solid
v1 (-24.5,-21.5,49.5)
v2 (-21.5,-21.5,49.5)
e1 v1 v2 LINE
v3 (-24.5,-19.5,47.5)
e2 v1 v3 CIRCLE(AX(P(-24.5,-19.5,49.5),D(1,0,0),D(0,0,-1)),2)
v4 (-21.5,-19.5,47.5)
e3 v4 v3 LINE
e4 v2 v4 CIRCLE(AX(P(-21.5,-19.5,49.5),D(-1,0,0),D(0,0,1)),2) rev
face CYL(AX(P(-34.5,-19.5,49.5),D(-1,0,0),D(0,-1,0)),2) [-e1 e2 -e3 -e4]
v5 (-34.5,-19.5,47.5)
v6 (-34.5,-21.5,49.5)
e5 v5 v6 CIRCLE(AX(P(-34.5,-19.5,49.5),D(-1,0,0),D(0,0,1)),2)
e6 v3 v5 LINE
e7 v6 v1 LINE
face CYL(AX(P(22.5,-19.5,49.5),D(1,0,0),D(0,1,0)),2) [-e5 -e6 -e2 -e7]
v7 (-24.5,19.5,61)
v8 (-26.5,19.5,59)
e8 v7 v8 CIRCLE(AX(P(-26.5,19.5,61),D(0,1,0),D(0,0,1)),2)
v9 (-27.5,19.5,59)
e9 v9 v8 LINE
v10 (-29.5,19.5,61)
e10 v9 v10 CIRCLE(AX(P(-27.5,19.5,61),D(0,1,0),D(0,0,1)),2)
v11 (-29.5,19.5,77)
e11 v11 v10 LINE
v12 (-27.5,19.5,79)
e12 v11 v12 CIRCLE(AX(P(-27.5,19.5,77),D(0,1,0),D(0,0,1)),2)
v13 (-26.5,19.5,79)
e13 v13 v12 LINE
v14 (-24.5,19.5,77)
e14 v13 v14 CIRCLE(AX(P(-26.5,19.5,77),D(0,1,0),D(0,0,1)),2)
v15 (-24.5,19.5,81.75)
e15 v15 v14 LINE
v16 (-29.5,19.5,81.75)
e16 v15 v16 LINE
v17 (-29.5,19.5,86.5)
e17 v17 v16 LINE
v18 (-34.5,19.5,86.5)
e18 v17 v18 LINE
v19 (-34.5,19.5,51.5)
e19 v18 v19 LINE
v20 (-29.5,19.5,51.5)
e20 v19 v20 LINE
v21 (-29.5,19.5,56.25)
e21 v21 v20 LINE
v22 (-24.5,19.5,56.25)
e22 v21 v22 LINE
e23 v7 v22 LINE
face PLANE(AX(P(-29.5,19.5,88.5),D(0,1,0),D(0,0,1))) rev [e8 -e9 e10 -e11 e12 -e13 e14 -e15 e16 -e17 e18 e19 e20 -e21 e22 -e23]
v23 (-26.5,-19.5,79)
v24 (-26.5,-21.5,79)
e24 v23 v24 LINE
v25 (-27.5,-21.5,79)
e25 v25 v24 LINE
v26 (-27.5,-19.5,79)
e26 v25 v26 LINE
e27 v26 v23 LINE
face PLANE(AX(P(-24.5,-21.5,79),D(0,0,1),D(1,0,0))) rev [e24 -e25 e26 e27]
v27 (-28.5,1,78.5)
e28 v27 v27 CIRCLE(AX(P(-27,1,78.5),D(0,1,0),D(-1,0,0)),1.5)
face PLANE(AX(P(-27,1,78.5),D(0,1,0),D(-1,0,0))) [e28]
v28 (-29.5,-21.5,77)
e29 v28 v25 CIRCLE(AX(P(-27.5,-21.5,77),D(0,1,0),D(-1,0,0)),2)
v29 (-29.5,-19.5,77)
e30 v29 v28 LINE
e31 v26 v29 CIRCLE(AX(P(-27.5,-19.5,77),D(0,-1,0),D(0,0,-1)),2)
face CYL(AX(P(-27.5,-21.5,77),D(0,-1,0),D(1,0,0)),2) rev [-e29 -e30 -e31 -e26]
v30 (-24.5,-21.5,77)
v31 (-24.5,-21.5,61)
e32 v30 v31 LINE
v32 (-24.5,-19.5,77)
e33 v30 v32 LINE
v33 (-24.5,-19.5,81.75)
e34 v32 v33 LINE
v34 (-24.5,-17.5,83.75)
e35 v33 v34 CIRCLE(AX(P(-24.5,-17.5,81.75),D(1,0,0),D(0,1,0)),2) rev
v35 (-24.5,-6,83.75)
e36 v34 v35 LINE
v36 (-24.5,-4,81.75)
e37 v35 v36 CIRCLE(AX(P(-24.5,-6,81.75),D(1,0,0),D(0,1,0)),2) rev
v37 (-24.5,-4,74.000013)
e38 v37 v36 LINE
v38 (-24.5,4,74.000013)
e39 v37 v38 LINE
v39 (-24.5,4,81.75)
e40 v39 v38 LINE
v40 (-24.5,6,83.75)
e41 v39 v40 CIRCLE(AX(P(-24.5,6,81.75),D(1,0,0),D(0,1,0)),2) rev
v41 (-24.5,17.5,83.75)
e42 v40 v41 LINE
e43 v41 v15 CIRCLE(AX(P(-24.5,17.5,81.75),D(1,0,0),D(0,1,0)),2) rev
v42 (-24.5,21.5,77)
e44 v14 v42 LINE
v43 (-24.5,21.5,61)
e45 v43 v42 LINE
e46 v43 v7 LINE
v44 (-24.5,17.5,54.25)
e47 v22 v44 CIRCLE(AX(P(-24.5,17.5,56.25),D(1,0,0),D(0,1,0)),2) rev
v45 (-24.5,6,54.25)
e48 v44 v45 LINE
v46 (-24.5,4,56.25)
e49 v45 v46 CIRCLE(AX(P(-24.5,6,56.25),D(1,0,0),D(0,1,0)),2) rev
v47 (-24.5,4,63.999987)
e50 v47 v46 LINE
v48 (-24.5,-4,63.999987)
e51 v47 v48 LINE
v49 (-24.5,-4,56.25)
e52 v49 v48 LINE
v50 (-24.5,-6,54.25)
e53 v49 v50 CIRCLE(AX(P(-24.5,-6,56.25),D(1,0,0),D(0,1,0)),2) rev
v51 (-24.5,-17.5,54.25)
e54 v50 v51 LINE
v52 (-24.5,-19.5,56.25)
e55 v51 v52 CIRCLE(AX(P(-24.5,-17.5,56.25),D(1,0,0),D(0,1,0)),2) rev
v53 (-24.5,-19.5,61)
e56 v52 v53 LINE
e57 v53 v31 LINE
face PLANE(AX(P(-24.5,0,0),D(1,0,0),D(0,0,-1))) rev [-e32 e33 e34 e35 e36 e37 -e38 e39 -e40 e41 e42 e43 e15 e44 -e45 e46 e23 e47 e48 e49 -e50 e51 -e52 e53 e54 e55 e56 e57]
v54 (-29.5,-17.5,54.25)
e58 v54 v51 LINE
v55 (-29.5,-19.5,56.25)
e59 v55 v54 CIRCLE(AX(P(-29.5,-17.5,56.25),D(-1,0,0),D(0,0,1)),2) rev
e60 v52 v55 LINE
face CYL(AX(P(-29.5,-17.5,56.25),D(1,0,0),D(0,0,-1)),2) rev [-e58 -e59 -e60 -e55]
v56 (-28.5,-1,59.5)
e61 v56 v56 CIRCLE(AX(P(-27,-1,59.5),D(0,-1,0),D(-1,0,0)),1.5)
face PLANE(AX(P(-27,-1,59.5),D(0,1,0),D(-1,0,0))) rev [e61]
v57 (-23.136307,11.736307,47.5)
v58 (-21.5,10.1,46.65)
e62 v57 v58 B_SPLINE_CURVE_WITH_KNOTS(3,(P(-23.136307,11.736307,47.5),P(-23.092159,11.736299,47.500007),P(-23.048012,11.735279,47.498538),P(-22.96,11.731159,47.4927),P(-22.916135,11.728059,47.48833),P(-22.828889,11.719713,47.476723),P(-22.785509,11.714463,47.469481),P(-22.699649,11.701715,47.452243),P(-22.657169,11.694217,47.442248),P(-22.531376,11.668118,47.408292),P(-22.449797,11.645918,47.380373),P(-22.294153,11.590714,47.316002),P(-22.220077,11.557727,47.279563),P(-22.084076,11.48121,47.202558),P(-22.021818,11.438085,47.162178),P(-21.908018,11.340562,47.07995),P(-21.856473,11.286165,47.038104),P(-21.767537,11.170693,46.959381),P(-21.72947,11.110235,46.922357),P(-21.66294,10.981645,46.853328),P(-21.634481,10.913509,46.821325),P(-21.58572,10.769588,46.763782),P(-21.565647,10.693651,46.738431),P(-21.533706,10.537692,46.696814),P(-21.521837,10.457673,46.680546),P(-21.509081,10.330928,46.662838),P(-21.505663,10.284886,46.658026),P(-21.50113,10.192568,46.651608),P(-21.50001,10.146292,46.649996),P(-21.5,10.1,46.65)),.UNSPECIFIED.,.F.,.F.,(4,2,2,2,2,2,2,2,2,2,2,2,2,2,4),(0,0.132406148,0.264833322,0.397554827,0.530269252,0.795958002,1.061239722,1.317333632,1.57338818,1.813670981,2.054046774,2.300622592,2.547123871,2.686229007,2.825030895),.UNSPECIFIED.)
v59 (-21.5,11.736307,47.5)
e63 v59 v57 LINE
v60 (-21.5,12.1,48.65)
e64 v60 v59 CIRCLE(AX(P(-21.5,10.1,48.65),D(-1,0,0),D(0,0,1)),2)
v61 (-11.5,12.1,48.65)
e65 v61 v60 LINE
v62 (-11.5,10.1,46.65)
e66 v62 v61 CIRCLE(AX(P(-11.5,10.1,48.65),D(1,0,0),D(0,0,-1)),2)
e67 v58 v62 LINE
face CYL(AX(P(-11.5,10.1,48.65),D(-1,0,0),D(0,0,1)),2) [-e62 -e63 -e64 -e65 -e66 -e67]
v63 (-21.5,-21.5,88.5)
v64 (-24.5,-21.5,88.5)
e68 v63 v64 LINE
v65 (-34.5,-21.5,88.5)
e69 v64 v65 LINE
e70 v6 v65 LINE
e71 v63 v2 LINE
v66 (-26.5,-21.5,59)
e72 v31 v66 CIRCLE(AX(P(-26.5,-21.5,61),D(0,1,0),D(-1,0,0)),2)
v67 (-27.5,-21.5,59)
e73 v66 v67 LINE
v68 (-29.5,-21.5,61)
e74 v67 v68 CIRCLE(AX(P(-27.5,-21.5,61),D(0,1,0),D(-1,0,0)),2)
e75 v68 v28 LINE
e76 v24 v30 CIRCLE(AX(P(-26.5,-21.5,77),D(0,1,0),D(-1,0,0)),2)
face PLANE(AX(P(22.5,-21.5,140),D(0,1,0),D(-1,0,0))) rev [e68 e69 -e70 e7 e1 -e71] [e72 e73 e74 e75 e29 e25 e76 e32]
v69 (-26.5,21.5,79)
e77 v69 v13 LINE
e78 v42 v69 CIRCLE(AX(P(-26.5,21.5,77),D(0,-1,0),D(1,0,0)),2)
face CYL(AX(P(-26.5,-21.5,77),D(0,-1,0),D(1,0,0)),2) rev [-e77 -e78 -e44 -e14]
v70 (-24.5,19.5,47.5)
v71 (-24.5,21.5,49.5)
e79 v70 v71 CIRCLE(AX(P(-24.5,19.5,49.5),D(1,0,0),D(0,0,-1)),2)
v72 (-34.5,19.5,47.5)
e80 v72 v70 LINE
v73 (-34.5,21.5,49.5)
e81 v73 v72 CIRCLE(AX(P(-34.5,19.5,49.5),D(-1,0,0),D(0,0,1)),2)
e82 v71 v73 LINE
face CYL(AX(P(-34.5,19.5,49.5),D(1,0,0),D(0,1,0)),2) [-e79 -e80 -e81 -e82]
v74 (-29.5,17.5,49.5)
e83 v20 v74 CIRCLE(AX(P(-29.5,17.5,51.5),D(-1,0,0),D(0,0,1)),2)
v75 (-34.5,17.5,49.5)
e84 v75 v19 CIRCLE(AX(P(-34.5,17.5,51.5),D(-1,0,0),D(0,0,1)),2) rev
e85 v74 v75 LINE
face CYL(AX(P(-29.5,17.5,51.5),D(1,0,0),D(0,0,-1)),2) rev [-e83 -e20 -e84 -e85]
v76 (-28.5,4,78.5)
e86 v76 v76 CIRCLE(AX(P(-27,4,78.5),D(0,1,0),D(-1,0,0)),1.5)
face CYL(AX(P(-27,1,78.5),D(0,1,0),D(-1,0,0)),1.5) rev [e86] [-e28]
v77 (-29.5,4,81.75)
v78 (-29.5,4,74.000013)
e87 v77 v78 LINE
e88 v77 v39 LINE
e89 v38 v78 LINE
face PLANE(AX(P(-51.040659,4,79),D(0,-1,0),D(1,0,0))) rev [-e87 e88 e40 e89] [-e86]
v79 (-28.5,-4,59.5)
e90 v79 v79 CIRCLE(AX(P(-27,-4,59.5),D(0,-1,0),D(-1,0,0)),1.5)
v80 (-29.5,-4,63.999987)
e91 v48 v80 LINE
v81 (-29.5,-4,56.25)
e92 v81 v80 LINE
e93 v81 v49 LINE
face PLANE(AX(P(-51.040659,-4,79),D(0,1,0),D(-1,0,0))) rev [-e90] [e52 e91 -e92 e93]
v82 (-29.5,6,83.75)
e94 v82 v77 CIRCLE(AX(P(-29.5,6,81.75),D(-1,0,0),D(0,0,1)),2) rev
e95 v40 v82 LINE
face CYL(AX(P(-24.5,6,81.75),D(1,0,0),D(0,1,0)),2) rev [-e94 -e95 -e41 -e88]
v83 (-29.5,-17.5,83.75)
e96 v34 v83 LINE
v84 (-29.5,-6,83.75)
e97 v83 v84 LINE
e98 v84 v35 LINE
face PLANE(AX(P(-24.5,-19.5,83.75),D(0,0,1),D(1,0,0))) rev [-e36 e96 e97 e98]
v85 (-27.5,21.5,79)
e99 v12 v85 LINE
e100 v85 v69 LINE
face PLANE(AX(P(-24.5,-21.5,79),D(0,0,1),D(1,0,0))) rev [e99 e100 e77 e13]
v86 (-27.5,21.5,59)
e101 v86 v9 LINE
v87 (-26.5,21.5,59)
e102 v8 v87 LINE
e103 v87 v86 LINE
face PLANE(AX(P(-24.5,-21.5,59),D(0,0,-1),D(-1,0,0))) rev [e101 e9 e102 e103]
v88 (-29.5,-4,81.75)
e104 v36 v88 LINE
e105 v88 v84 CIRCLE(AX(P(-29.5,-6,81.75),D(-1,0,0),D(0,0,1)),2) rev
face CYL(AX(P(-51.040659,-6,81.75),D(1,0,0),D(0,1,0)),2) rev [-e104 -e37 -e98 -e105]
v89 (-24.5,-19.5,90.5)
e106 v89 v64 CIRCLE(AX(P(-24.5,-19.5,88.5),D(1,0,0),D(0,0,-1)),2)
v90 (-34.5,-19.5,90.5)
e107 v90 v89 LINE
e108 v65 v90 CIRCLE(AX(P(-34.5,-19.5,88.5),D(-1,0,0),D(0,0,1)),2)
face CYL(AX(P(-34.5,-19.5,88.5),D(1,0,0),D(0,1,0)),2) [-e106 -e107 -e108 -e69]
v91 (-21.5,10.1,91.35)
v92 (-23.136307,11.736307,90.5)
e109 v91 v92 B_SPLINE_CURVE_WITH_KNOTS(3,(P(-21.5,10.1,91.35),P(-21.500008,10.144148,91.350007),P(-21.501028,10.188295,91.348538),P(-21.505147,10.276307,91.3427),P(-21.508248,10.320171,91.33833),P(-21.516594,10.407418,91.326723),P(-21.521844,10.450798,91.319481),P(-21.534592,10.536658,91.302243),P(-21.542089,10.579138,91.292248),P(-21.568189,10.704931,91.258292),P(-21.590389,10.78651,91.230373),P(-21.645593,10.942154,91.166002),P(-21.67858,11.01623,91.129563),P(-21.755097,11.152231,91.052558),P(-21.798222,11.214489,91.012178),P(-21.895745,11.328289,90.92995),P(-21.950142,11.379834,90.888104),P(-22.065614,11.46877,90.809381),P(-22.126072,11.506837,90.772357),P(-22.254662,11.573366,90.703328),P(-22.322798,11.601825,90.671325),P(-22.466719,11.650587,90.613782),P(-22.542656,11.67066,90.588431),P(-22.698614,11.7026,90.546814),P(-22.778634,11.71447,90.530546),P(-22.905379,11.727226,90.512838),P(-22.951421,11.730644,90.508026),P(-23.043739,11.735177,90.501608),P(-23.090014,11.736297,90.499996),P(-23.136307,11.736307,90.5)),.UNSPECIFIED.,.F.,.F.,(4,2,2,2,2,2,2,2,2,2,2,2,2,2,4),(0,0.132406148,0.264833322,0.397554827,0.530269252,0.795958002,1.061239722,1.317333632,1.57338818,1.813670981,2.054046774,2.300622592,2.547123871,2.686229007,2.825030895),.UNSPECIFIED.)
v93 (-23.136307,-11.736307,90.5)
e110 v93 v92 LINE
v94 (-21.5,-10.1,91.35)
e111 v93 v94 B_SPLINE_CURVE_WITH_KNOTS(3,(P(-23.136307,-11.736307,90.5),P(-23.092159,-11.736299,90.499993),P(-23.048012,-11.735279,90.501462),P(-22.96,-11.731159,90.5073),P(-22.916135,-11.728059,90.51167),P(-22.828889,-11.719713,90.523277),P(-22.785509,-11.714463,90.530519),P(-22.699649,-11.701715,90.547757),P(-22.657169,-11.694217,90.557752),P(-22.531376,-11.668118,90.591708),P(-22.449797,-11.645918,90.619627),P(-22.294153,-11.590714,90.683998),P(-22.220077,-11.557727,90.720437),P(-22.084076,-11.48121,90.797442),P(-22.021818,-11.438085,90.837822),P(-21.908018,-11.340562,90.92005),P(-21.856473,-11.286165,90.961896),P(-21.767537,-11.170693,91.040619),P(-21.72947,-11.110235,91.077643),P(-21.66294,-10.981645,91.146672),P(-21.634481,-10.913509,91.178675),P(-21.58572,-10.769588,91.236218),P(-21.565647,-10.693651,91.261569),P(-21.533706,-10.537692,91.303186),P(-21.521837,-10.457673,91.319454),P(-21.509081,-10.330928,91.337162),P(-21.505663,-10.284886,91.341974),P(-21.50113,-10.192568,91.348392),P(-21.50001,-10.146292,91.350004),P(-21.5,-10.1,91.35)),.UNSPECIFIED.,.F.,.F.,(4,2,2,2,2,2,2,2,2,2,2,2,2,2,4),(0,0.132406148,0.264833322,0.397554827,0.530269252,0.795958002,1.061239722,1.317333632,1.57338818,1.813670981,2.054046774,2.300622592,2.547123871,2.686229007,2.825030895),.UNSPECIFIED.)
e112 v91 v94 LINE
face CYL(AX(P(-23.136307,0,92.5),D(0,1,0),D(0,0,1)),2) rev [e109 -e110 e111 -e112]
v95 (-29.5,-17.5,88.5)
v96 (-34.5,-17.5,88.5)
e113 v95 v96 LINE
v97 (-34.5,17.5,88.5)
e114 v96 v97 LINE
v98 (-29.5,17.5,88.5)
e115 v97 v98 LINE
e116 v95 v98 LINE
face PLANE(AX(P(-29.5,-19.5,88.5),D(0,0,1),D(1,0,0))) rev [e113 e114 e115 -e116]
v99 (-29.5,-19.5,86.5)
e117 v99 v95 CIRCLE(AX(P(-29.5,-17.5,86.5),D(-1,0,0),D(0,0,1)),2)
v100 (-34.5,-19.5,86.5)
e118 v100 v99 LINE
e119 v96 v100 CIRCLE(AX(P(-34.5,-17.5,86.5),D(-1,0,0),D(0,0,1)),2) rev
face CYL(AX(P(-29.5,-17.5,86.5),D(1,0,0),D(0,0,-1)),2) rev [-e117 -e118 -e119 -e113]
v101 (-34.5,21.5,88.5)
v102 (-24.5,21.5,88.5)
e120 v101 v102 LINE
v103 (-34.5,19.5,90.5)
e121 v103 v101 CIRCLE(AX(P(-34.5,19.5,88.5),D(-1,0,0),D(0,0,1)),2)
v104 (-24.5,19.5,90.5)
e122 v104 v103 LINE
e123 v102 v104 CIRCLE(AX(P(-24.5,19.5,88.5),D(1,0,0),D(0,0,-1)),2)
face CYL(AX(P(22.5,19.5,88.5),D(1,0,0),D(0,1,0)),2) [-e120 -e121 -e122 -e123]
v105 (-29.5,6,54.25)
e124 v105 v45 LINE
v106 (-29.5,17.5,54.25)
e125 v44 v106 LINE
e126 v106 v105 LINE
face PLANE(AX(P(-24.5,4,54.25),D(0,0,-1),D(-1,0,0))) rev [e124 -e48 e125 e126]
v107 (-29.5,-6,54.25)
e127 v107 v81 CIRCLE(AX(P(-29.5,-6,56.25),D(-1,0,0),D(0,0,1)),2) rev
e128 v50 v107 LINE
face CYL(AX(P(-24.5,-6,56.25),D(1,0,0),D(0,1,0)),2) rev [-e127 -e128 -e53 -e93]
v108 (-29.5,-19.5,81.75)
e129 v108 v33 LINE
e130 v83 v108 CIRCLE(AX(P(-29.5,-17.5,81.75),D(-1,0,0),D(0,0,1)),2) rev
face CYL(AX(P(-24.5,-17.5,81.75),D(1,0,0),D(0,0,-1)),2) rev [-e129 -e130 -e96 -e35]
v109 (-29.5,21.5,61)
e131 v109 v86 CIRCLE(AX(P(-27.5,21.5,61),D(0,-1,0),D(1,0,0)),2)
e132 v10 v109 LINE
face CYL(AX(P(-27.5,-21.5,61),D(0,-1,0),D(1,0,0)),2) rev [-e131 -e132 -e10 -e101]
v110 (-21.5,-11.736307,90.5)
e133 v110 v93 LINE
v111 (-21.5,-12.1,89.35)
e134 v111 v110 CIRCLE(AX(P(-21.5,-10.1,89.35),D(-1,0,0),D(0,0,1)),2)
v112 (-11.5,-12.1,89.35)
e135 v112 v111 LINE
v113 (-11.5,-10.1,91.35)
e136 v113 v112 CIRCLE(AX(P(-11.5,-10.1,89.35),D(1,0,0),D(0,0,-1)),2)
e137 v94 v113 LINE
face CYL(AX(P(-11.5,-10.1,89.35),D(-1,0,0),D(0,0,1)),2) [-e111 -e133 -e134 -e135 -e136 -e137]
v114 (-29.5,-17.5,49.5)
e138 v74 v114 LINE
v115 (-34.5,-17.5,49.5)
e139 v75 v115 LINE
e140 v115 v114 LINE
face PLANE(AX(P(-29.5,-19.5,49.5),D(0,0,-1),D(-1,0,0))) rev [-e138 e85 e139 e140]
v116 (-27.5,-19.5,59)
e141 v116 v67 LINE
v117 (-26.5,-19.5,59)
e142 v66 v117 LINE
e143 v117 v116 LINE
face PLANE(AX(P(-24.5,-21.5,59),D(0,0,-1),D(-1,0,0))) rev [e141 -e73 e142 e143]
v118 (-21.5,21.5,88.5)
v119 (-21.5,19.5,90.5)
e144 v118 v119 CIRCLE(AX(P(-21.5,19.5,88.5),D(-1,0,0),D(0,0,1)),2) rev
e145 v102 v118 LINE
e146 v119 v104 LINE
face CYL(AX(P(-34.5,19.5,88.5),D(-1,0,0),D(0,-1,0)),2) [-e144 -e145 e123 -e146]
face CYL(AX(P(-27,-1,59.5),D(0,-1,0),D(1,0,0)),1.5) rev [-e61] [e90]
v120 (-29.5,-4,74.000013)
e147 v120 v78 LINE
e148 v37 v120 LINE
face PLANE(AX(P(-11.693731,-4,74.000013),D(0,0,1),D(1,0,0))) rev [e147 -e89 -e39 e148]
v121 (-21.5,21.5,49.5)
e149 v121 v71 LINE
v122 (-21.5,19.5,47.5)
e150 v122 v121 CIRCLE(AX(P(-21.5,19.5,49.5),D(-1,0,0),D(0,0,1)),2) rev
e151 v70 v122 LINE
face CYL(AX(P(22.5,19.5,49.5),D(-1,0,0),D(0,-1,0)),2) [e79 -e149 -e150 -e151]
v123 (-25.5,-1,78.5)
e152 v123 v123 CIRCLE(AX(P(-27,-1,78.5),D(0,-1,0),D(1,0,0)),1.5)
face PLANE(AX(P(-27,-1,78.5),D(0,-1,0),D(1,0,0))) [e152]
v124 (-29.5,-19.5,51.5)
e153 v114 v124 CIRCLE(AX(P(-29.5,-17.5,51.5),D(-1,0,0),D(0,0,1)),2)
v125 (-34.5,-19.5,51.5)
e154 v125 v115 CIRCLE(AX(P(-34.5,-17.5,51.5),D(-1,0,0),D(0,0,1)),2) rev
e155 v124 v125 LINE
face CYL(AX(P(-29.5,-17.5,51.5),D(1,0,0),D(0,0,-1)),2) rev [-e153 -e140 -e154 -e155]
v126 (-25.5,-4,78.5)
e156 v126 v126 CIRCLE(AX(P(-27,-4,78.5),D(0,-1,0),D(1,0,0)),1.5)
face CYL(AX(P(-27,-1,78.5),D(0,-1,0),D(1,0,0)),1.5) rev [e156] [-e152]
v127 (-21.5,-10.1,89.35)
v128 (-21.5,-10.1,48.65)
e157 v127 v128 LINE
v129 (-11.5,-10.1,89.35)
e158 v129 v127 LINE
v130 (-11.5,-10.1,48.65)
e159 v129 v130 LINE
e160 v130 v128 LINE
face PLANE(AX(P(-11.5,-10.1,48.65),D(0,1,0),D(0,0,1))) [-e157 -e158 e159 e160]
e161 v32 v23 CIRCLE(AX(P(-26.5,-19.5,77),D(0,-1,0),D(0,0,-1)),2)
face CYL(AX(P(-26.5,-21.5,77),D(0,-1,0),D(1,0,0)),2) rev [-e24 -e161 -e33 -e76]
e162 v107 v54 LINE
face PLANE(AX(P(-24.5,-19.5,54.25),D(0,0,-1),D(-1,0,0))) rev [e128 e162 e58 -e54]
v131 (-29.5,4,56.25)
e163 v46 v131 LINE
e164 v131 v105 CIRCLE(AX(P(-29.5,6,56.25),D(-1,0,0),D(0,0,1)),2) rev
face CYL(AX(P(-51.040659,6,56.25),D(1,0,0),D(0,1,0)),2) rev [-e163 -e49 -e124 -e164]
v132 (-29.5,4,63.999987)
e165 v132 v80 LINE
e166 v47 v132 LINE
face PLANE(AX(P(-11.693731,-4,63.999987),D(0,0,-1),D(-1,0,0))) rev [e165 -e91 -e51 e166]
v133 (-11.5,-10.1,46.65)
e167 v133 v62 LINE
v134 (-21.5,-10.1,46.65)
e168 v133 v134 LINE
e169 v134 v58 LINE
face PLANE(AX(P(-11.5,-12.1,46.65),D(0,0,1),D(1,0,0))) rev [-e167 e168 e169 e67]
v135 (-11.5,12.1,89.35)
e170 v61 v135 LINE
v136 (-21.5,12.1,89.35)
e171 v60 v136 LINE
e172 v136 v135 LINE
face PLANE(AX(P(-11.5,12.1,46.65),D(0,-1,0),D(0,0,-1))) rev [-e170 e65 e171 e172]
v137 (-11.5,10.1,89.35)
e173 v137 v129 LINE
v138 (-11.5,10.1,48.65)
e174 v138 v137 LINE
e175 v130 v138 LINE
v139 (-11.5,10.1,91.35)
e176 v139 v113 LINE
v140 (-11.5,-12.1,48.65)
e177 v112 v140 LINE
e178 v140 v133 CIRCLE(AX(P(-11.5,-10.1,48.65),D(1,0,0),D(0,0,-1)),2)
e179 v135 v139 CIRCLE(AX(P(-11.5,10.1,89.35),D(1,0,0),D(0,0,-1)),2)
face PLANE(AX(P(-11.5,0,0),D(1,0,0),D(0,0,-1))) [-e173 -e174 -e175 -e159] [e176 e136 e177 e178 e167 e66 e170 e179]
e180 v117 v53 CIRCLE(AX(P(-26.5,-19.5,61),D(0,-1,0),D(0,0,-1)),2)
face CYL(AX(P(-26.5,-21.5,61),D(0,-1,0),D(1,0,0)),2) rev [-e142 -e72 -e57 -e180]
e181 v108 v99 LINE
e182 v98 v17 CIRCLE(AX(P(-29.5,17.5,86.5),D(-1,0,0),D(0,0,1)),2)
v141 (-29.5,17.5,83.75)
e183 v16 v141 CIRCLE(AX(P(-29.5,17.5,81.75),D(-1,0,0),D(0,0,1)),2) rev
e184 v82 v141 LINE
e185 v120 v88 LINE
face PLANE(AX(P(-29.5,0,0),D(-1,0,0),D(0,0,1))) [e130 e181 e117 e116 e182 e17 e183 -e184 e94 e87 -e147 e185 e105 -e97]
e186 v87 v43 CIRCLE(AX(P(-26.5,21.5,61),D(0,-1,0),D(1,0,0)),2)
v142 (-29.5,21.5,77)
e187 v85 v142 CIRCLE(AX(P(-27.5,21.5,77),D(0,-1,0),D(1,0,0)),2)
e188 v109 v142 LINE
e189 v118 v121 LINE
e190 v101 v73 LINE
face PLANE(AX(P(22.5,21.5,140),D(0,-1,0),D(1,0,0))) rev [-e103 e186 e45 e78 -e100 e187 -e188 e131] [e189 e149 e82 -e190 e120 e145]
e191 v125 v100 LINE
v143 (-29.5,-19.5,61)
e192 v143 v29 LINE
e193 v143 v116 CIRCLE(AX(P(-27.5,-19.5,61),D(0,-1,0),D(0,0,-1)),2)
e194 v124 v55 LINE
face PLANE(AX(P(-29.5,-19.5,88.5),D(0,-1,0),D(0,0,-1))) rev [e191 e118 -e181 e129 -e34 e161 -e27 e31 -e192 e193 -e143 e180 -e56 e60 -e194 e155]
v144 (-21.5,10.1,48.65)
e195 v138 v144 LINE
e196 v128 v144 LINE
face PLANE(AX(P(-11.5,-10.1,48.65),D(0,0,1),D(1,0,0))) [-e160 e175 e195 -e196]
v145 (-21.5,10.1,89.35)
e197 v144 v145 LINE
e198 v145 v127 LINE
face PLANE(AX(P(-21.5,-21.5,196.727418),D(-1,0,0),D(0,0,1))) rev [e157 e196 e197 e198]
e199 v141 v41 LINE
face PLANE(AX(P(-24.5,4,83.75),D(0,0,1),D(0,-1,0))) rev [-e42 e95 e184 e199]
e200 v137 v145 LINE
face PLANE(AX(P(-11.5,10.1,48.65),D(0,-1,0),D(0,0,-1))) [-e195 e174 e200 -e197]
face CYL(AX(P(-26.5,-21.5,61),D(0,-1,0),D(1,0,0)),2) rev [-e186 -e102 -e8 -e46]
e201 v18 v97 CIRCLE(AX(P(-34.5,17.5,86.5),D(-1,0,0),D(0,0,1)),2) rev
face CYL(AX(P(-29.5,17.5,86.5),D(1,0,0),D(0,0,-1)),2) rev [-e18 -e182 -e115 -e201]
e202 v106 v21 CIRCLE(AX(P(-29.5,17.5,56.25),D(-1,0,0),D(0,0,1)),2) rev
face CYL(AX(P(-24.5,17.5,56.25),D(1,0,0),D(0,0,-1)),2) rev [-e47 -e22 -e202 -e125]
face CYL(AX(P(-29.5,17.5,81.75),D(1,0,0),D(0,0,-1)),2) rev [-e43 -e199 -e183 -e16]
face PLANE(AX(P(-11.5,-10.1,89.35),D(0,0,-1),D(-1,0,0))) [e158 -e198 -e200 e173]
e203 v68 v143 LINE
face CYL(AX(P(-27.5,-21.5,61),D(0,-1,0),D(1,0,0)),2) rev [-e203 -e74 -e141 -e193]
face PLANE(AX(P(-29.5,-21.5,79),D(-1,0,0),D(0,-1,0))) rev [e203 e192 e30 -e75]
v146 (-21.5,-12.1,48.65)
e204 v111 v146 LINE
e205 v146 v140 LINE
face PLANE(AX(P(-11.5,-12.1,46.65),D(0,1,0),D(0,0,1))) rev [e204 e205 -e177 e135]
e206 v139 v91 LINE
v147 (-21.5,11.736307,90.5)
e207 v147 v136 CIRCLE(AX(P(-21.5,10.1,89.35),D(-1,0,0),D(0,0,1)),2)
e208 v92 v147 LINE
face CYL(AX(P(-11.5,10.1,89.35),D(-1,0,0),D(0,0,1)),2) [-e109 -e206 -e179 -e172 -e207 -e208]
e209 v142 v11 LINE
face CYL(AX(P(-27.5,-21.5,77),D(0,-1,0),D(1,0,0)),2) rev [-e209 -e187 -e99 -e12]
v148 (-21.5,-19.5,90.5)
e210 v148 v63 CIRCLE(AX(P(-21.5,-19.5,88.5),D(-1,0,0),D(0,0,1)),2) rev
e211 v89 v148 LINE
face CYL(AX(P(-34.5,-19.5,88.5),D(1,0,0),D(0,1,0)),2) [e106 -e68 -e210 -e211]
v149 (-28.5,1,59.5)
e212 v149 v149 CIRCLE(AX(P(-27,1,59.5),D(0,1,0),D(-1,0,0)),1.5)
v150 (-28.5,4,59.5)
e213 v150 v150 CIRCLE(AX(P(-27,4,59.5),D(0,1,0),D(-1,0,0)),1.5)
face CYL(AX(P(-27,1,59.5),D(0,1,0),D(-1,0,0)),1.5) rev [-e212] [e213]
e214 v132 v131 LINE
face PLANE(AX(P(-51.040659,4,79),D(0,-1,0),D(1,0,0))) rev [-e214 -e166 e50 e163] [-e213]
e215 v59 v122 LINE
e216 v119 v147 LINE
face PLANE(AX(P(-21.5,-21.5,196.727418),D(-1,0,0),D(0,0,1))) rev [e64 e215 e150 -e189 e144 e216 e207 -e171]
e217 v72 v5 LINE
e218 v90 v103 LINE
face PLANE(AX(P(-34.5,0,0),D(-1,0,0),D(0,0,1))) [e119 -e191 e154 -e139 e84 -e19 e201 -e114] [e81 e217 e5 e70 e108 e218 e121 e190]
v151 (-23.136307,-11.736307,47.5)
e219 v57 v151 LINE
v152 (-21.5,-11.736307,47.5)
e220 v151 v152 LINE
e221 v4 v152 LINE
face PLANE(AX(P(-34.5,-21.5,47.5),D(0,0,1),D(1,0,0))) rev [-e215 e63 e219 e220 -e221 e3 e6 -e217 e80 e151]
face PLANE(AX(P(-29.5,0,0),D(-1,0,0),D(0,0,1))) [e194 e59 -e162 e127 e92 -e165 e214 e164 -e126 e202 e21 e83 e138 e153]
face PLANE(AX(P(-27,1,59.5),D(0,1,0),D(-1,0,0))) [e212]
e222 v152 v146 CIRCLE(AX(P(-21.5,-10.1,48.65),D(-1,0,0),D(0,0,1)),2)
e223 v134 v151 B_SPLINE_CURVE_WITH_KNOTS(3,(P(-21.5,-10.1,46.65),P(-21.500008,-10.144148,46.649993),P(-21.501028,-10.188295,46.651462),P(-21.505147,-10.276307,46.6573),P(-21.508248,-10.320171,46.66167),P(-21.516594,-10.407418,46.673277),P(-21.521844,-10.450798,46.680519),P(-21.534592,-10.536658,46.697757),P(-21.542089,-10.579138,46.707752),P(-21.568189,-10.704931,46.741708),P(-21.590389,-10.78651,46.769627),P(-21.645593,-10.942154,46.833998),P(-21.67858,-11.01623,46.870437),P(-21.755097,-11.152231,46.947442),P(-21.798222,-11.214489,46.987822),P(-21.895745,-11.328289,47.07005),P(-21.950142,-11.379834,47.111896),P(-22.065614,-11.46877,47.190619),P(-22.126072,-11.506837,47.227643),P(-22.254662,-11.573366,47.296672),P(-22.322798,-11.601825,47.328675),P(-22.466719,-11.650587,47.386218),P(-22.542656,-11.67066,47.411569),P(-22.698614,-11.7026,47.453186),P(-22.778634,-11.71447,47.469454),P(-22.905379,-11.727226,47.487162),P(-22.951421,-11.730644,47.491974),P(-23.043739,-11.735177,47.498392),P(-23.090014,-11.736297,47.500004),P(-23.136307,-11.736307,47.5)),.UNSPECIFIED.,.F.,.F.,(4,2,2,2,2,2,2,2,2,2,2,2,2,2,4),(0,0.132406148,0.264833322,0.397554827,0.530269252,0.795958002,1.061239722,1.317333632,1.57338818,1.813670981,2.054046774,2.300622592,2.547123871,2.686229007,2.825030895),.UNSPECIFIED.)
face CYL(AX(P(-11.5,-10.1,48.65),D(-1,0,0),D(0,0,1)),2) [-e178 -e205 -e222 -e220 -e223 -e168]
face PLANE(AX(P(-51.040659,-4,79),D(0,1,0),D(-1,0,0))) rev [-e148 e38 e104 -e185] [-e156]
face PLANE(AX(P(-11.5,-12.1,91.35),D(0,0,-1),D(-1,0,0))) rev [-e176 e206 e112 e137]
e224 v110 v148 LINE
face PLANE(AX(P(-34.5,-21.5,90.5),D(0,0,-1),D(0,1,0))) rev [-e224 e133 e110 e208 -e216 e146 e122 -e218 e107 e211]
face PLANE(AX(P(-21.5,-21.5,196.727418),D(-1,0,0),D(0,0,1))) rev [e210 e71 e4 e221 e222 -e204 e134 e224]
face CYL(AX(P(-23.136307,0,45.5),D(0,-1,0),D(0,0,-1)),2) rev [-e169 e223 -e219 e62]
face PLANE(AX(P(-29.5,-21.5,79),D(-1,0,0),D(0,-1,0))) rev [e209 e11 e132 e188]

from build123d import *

# Parameters (mm, degrees)
EXTRUDE_1_DEPTH      = 140
SKETCH_3_W           = 49
SKETCH_3_H           = 43
EXTRUDE_1_2_DEPTH    = 2
EXTRUDE_2_DEPTH      = 10
SKETCH_5_W           = 39
SKETCH_5_H           = 38.99999999999997
CUT_EXTRUDE_1_DEPTH  = 5
SKETCH_6_W           = 5.000000000000007
SKETCH_6_H           = 20.000000000000007
CUT_EXTRUDE_2_DEPTH  = 151.46345071146015
SKETCH_8_W           = 20.000000000000007
SKETCH_8_H           = 8
EXTRUDE_4_DEPTH      = 5
SKETCH_9_W           = 29.500000000000007
SKETCH_9_H           = 15.499999999999984
CUT_EXTRUDE_3_DEPTH  = 5
SKETCH_10_R          = 1.5000000000000009
CUT_EXTRUDE_4_DEPTH  = 3
CUT_EXTRUDE_START    = -3
SKETCH_11_R          = 1.5000000000000009
CUT_EXTRUDE_5_DEPTH  = 3
FILLET_1_R           = 2
SKETCH_12_W          = 10.000025874030214
SKETCH_12_H          = 7.999999999999993
CUT_EXTRUDE_6_DEPTH  = 5
FILLET_2_R           = 2
FILLET_3_R           = 2
FILLET_4_R           = 2
SKETCH_14_W          = 49
SKETCH_14_H          = 42.99999999999999
CUT_EXTRUDE_7_DEPTH  = 148.70409608402875
EXTRUDE_5_DEPTH      = 43
SKETCH_16_W          = 37
SKETCH_16_H          = 43.00000000000001
CUT_EXTRUDE_8_DEPTH  = 139
CUT_EXTRUDE_9_DEPTH  = 153.28673612629564
CUT_EXTRUDE_10_DEPTH = 10
CUT_EXTRUDE_11_DEPTH = 10
CUT_EXTRUDE_START_2  = -10
CUT_EXTRUDE_12_DEPTH = 10
FILLET_5_R           = 2
SKETCH_22_W          = 55.90289096918082
SKETCH_22_H          = 52.99366384823722
SKETCH_22_W_2        = 63.39349332103703
SKETCH_22_H_2        = 60.631140756012414
CUT_EXTRUDE_13_DEPTH = 149.4898986463389
SKETCH_24_W          = 48.12895324765829
SKETCH_24_H          = 5.063364692861221
SKETCH_24_W_2        = 50.818083994342985
SKETCH_24_H_2        = 4.997776138063802
CUT_EXTRUDE_14_DEPTH = 104.14795199130229
SKETCH_25_W          = 20.23714780138212
SKETCH_25_H          = 49.24602860882409
CUT_EXTRUDE_15_DEPTH = 106.96933518711913
FILLET_6_R           = 2
EXTRUDE_6_DEPTH      = 10
FILLET_7_R           = 2
FILLET_8_R           = 2


with BuildPart() as part:
    # 草图1 → Extrude 1 (new body)
    with BuildSketch(Plane.XY):
        Polygon((-24.49999999999998, 21.499999999999993), (24.50000000000002, 21.5), (24.50000000000002, -21.5), (-24.49999999999998, -21.500000000000007), align=None)
        Polygon((-22.49999999999998, 19.499999999999993), (22.50000000000002, 19.5), (22.50000000000002, -19.5), (-22.49999999999998, -19.500000000000007), align=None, mode=Mode.SUBTRACT)
    extrude(amount=EXTRUDE_1_DEPTH)

    # 草图3 → Extrude 1 2 (add)
    with BuildSketch(Plane(origin=(0, 0, 0), x_dir=(-1, 0, 0), z_dir=(0, 0, -1))):
        Rectangle(SKETCH_3_W, SKETCH_3_H)
    extrude(amount=EXTRUDE_1_2_DEPTH)

    # 草图4 → 凸台-拉伸2 (add)
    with BuildSketch(Plane.ZY.offset(24.49999999999998)):
        Polygon((90.5, -21.499999999999996), (47.50000000000001, -21.499999999999996), (47.50000000000001, 21.499999999999993), (90.50000000000001, 21.499999999999993), align=None)
    extrude(amount=EXTRUDE_2_DEPTH)

    # 草图5 → 切除-拉伸1 (cut)
    with BuildSketch(Plane.ZY.offset(34.49999999999998)):
        with Locations((69, 1.78e-15)):
            Rectangle(SKETCH_5_W, SKETCH_5_H)
    extrude(amount=-CUT_EXTRUDE_1_DEPTH, mode=Mode.SUBTRACT)

    # 草图6 → 切除-拉伸2 (cut, through all)
    with BuildSketch(Plane(origin=(-3.32e-15, 21.499999999999996, 0), x_dir=(1, 1.5e-16, 0), z_dir=(-1.5e-16, 1, 0))):
        with Locations((-26.99999999999998, -69.00000000000001)):
            Rectangle(SKETCH_6_W, SKETCH_6_H)
    extrude(amount=-CUT_EXTRUDE_2_DEPTH, mode=Mode.SUBTRACT)

    # 草图8 → 凸台-拉伸4 (add)
    with BuildSketch(Plane.ZY.offset(24.499999999999975)):
        with Locations((69.00000000000001, 4.4e-16)):
            Rectangle(SKETCH_8_W, SKETCH_8_H)
    extrude(amount=EXTRUDE_4_DEPTH)

    # 草图9 → 切除-拉伸3 (cut)
    with BuildSketch(Plane.ZY.offset(29.499999999999982)):
        Polygon((83.75000000000001, 3.9999999999999964), (54.25000000000001, 3.9999999999999964), (54.25000000000001, 19.49999999999999), (83.75, 19.49999999999999), align=None)
        with Locations((69.00000000000001, -11.749999999999996)):
            Rectangle(SKETCH_9_W, SKETCH_9_H)
    extrude(amount=-CUT_EXTRUDE_3_DEPTH, mode=Mode.SUBTRACT)

    # 草图10 → 切除-拉伸4 (cut)
    with BuildSketch(Plane.XZ.offset(4)):
        with Locations((-26.99999999999998, 78.5)):
            Circle(SKETCH_10_R)
        with Locations(Location((-26.999999999999975, 59.500000000000014, 0), (0, 0, 180))):
            Circle(SKETCH_10_R)
    extrude(amount=-CUT_EXTRUDE_4_DEPTH, mode=Mode.SUBTRACT)

    # 草图11 → 切除-拉伸5 (cut)
    with BuildSketch(Plane(origin=(-6.2e-16, 4.000000000000001, 0), x_dir=(1, 1.5e-16, 0), z_dir=(-1.5e-16, 1, 0)).offset(CUT_EXTRUDE_START)):
        with Locations(Location((-26.999999999999975, -59.500000000000014, 0), (0, 0, 180))):
            Circle(SKETCH_11_R)
        with Locations((-26.99999999999998, -78.5)):
            Circle(SKETCH_11_R)
    extrude(amount=CUT_EXTRUDE_5_DEPTH, mode=Mode.SUBTRACT)

    # 圆角1
    fillet_1_edges = [part.edges().sort_by_distance(p)[0] for p in [
        (-24.49999999999998, 20.499999999999993, 79.00000000000001),
        (-24.49999999999998, 20.499999999999993, 59.00000000000001),
        (-29.49999999999998, -20.499999999999993, 79.00000000000001),
        (-29.499999999999986, 20.499999999999993, 79.00000000000001),
        (-29.49999999999998, -20.499999999999993, 59.00000000000001),
        (-29.499999999999986, 20.499999999999993, 59.00000000000001),
        (-24.49999999999997, -20.5, 59.00000000000001),
        (-24.49999999999997, -20.5, 79.00000000000001),
    ]]
    fillet(fillet_1_edges, radius=FILLET_1_R)

    # 草图12 → 切除-拉伸6 (cut)
    with BuildSketch(Plane.ZY.offset(29.499999999999982)):
        with Locations((69, 0)):
            Rectangle(SKETCH_12_W, SKETCH_12_H)
    extrude(amount=-CUT_EXTRUDE_6_DEPTH, mode=Mode.SUBTRACT)

    # 圆角2
    fillet_2_edges = [part.edges().sort_by_distance(p)[0] for p in [
        (-31.99999999999998, -19.499999999999986, 49.50000000000001),
        (-31.99999999999998, 19.49999999999999, 49.50000000000001),
        (-31.99999999999998, 19.49999999999999, 88.5),
        (-31.99999999999998, -19.499999999999986, 88.5),
    ]]
    fillet(fillet_2_edges, radius=FILLET_2_R)

    # 圆角3
    fillet_3_edges = [part.edges().sort_by_distance(p)[0] for p in [
        (-29.49999999999998, 21.499999999999993, 47.50000000000001),
        (-29.49999999999998, -21.499999999999996, 47.50000000000001),
        (-29.49999999999998, -21.499999999999996, 90.5),
        (-29.49999999999998, 21.499999999999993, 90.50000000000001),
    ]]
    fillet(fillet_3_edges, radius=FILLET_3_R)

    # 圆角4
    fillet_4_edges = [part.edges().sort_by_distance(p)[0] for p in [
        (-26.999999999999982, 3.9999999999999964, 83.75000000000001),
        (-26.999999999999982, 19.49999999999999, 54.25000000000001),
        (-26.999999999999982, 3.9999999999999964, 54.25000000000001),
        (-26.999999999999982, 19.49999999999999, 83.75),
        (-26.999999999999982, -4.000000000000005, 54.25000000000001),
        (-26.999999999999982, -19.49999999999999, 83.75000000000001),
        (-26.999999999999982, -19.49999999999999, 54.25000000000001),
        (-26.999999999999982, -4.000000000000005, 83.75000000000001),
    ]]
    fillet(fillet_4_edges, radius=FILLET_4_R)

    # 草图14 → 切除-拉伸7 (cut, through all)
    with BuildSketch(Plane.XY.offset(140)):
        Rectangle(SKETCH_14_W, SKETCH_14_H)
    extrude(amount=-CUT_EXTRUDE_7_DEPTH, mode=Mode.SUBTRACT)

    # 草图15 → 凸台-拉伸5 (add)
    with BuildSketch(Plane(origin=(-24.49999999999998, 0, 0), x_dir=(0, 0, -1), z_dir=(1, 0, 0))):
        Polygon((1.999999999999988, -24.499999999999993), (-140, -24.50000000000001), (-140, 24.49999999999999), (1.999999999999988, 24.500000000000007), align=None)
    extrude(amount=EXTRUDE_5_DEPTH)

    # 草图16 → 切除-拉伸8 (cut)
    with BuildSketch(Plane(origin=(0, 0, -1.999999999999988), x_dir=(-1, 0, 0), z_dir=(0, 0, -1))):
        with Locations((2.9999999999999813, 3.55e-15)):
            Rectangle(SKETCH_16_W, SKETCH_16_H)
    extrude(amount=-CUT_EXTRUDE_8_DEPTH, mode=Mode.SUBTRACT)

    # 草图17 → 切除-拉伸9 (cut, through all)
    with BuildSketch(Plane.XZ.offset(24.499999999999993)):
        with BuildLine():
            Line((-11.999999999999824, 112), (6.000000000000174, 112))
            ThreePointArc((6.000000000000174, 112), (9.000000000000174, 115.00000000000001), (6.00000000000014, 117.99999999999989))
            Line((6.00000000000014, 117.99999999999989), (-11.999999999999854, 117.99999999999969))
            ThreePointArc((-11.999999999999854, 117.99999999999969), (-14.999999999999512, 114.99999999999999), (-11.999999999999824, 112))
        make_face()
        with BuildLine():
            Line((-11.999999999999668, 97), (6.00000000000033, 97))
            ThreePointArc((6.00000000000033, 97), (9.00000000000033, 100.00000000000001), (6.000000000000297, 102.99999999999947))
            Line((6.000000000000297, 102.99999999999947), (-11.999999999999698, 102.99999999999929))
            ThreePointArc((-11.999999999999698, 102.99999999999929), (-14.999999999998957, 99.99999999999999), (-11.999999999999668, 97))
        make_face()
        with BuildLine():
            Line((-11.999999999999512, 82), (6.000000000000487, 82))
            ThreePointArc((6.000000000000487, 82), (9.000000000000487, 85.00000000000001), (6.000000000000453, 87.99999999999908))
            Line((6.000000000000453, 87.99999999999908), (-11.999999999999542, 87.99999999999889))
            ThreePointArc((-11.999999999999542, 87.99999999999889), (-14.999999999998403, 84.99999999999999), (-11.999999999999512, 82))
        make_face()
        with BuildLine():
            Line((-11.999999999999355, 67.00000000000058), (6.000000000000643, 67))
            ThreePointArc((6.000000000000643, 67), (9.000000000000643, 70), (6.000000000000643, 73.00000000000034))
            Line((6.000000000000643, 73.00000000000034), (-11.999999999999355, 73.00000000000034))
            ThreePointArc((-11.999999999999355, 73.00000000000034), (-14.999999999999696, 70), (-11.999999999999355, 67.00000000000058))
        make_face()
        with BuildLine():
            Line((-11.999999999999199, 51.99999999999935), (6.000000000000797, 51.99999999999936))
            ThreePointArc((6.000000000000797, 51.99999999999936), (8.999999999999595, 54.99999999999816), (6.000000000000797, 57.99999999999685))
            Line((6.000000000000797, 57.99999999999685), (-11.999999999999199, 57.99999999999686))
            ThreePointArc((-11.999999999999199, 57.99999999999686), (-14.999999999997955, 54.9999999999981), (-11.999999999999199, 51.99999999999935))
        make_face()
        with BuildLine():
            Line((-11.999999999999043, 36.99999999999916), (6.000000000000953, 36.999999999999154))
            ThreePointArc((6.000000000000953, 36.999999999999154), (8.99999999999956, 39.99999999999776), (6.000000000000953, 42.999999999996184))
            Line((6.000000000000953, 42.999999999996184), (-11.999999999999043, 42.99999999999625))
            ThreePointArc((-11.999999999999043, 42.99999999999625), (-14.999999999997586, 39.999999999997705), (-11.999999999999043, 36.99999999999916))
        make_face()
        with BuildLine():
            Line((-11.999999999998886, 21.99999999999899), (6.000000000001109, 21.999999999998987))
            ThreePointArc((6.000000000001109, 21.999999999998987), (8.999999999999478, 24.999999999997357), (6.000000000001109, 27.999999999995616))
            Line((6.000000000001109, 27.999999999995616), (-11.999999999998886, 27.999999999995612))
            ThreePointArc((-11.999999999998886, 27.999999999995612), (-14.999999999997195, 24.999999999997303), (-11.999999999998886, 21.99999999999899))
        make_face()
        with BuildLine():
            Line((-11.99999999999873, 6.9999999999987645), (6.000000000001266, 6.9999999999987645))
            ThreePointArc((6.000000000001266, 6.9999999999987645), (8.999999999999456, 9.999999999996955), (6.000000000001266, 12.999999999995037))
            Line((6.000000000001266, 12.999999999995037), (-11.99999999999873, 12.999999999995037))
            ThreePointArc((-11.99999999999873, 12.999999999995037), (-14.999999999996867, 9.9999999999969), (-11.99999999999873, 6.9999999999987645))
        make_face()
    extrude(amount=-CUT_EXTRUDE_9_DEPTH, mode=Mode.SUBTRACT)

    # 草图18 → 切除-拉伸10 (cut)
    with BuildSketch(Plane(origin=(18.500000000000018, 0, 0), x_dir=(0, 0, -1), z_dir=(1, 0, 0))):
        with BuildLine():
            Line((-118.00000000000001, 12), (-118.00000000000001, -12))
            ThreePointArc((-118.00000000000001, -12), (-115, -15.000000000000014), (-112, -12))
            Line((-112, -12), (-112, 12))
            ThreePointArc((-112, 12), (-115, 15), (-118.00000000000001, 12))
        make_face()
        with BuildLine():
            Line((-103.00000000000001, 12), (-103.00000000000001, -12))
            ThreePointArc((-103.00000000000001, -12), (-100, -15.000000000000014), (-97, -12))
            Line((-97, -12), (-97, 12))
            ThreePointArc((-97, 12), (-100, 15), (-103.00000000000001, 12))
        make_face()
        with BuildLine():
            Line((-88.00000000000001, 12), (-88.00000000000001, -12))
            ThreePointArc((-88.00000000000001, -12), (-85, -15.000000000000014), (-82, -12))
            Line((-82, -12), (-82, 12))
            ThreePointArc((-82, 12), (-85, 15), (-88.00000000000001, 12))
        make_face()
        with BuildLine():
            Line((-73.00000000000001, 12), (-73.00000000000001, -12))
            ThreePointArc((-73.00000000000001, -12), (-70, -15.000000000000014), (-67, -12))
            Line((-67, -12), (-67, 12))
            ThreePointArc((-67, 12), (-70, 15), (-73.00000000000001, 12))
        make_face()
        with BuildLine():
            Line((-58.00000000000001, 12), (-58.00000000000001, -12))
            ThreePointArc((-58.00000000000001, -12), (-55.00000000000001, -15), (-52.00000000000001, -12))
            Line((-52.00000000000001, -12), (-52.00000000000001, 12))
            ThreePointArc((-52.00000000000001, 12), (-55.00000000000001, 15), (-58.00000000000001, 12))
        make_face()
        with BuildLine():
            Line((-43.00000000000001, 12), (-43.00000000000001, -12))
            ThreePointArc((-43.00000000000001, -12), (-40.00000000000001, -15), (-37.00000000000001, -12))
            Line((-37.00000000000001, -12), (-37.00000000000001, 12))
            ThreePointArc((-37.00000000000001, 12), (-40.00000000000001, 15), (-43.00000000000001, 12))
        make_face()
        with BuildLine():
            Line((-28.00000000000001, 12), (-28.00000000000001, -12))
            ThreePointArc((-28.00000000000001, -12), (-25.000000000000007, -15.000000000000004), (-22.000000000000007, -12))
            Line((-22.000000000000007, -12), (-22.000000000000007, 12))
            ThreePointArc((-22.000000000000007, 12), (-25.000000000000007, 15), (-28.00000000000001, 12))
        make_face()
        with BuildLine():
            Line((-13.00000000000001, 12), (-13.00000000000001, -12))
            ThreePointArc((-13.00000000000001, -12), (-10.000000000000009, -15.000000000000002), (-7.000000000000006, -12))
            Line((-7.000000000000006, -12), (-7.000000000000006, 12))
            ThreePointArc((-7.000000000000006, 12), (-10.000000000000009, 15.000000000000004), (-13.00000000000001, 12))
        make_face()
    extrude(amount=-CUT_EXTRUDE_10_DEPTH, mode=Mode.SUBTRACT)

    # 草图19 → 切除-拉伸11 (cut)
    with BuildSketch(Plane.ZY.offset(24.49999999999998)):
        with BuildLine():
            Line((11.000000000000004, 12), (11.000000000000007, -12))
            ThreePointArc((11.000000000000007, -12), (8.000000000000007, -15), (5.000000000000007, -12))
            Line((5.000000000000007, -12), (5.000000000000004, 12))
            ThreePointArc((5.000000000000004, 12), (8.000000000000004, 15), (11.000000000000004, 12))
        make_face()
        with BuildLine():
            Line((20.000000000000004, 12), (20.000000000000007, -12))
            ThreePointArc((20.000000000000007, -12), (23.000000000000007, -15), (26.000000000000007, -12))
            Line((26.000000000000007, -12), (26.000000000000004, 12))
            ThreePointArc((26.000000000000004, 12), (23.000000000000004, 15), (20.000000000000004, 12))
        make_face()
        with BuildLine():
            Line((35, 12), (35, -12))
            ThreePointArc((35, -12), (38.00000000000001, -15.000000000000007), (41.00000000000001, -12))
            Line((41.00000000000001, -12), (41, 12))
            ThreePointArc((41, 12), (38.00000000000001, 14.999999999999993), (35, 12))
        make_face()
    extrude(amount=-CUT_EXTRUDE_11_DEPTH, mode=Mode.SUBTRACT)

    # 草图21 → 切除-拉伸12 (cut)
    with BuildSketch(Plane.ZY.offset(24.49999999999998).offset(CUT_EXTRUDE_START_2)):
        with BuildLine():
            Line((112, 11.999999999999895), (112, -12.000000000000107))
            ThreePointArc((112, -12.000000000000107), (115, -15.000000000000107), (118.00000000000001, -12.000000000000107))
            Line((118.00000000000001, -12.000000000000107), (118.00000000000001, 11.999999999999895))
            ThreePointArc((118.00000000000001, 11.999999999999895), (115.00000000000018, 14.999999999999725), (112, 11.999999999999895))
        make_face()
        with BuildLine():
            Line((97, 11.999999999999789), (97, -12.000000000000211))
            ThreePointArc((97, -12.000000000000211), (100, -15.000000000000211), (103.00000000000001, -12.000000000000211))
            Line((103.00000000000001, -12.000000000000211), (103.00000000000001, 11.999999999999789))
            ThreePointArc((103.00000000000001, 11.999999999999789), (100, 14.999999999999803), (97, 11.999999999999789))
        make_face()
    extrude(amount=CUT_EXTRUDE_12_DEPTH, mode=Mode.SUBTRACT)

    # 圆角5
    fillet_5_edges = [part.edges().sort_by_distance(p)[0] for p in [
        (-24.49999999999998, -24.5, 69.00000000000001),
        (-24.49999999999998, 24.5, 69),
        (18.50000000000002, -24.5, 69.00000000000001),
        (18.50000000000002, 24.5, 69),
    ]]
    fillet(fillet_5_edges, radius=FILLET_5_R)

    # 草图22 → 切除-拉伸13 (cut, through all)
    with BuildSketch(Plane.ZY.offset(24.49999999999998)):
        with Locations((19.54855451540959, -1.9968319241186077)):
            Rectangle(SKETCH_22_W, SKETCH_22_H)
        with Locations((122.19674666051851, 5.815570378006207)):
            Rectangle(SKETCH_22_W_2, SKETCH_22_H_2)
    extrude(amount=-CUT_EXTRUDE_13_DEPTH, mode=Mode.SUBTRACT)

    # 草图24 → 切除-拉伸14 (cut, through all)
    with BuildSketch(Plane.ZY.offset(24.49999999999998)):
        with Locations((71.56447662382917, 24.031682346430618)):
            Rectangle(SKETCH_24_W, SKETCH_24_H)
        with Locations((72.9090419971715, -23.9988880690319)):
            Rectangle(SKETCH_24_W_2, SKETCH_24_H_2)
    extrude(amount=-CUT_EXTRUDE_14_DEPTH, mode=Mode.SUBTRACT)


with BuildPart() as cut_extrude_14_piece_1:
    # of the separate pieces the step leaves, piece 1, a body of its own (cut_extrude_14_pieces)
    add(part.part.solids().sort_by_distance((-24.5, 21.5, 90.5))[0])

    # 圆角6
    fillet_6_edges = [cut_extrude_14_piece_1.edges().sort_by_distance(p)[0] for p in [
        (-22.99999999999998, 21.500000000000007, 47.500000000000014),
        (-22.99999999999998, -21.5, 47.500000000000014),
        (-22.99999999999998, -21.5, 90.5),
        (-22.99999999999998, 21.500000000000007, 90.5),
    ]]
    fillet(fillet_6_edges, radius=FILLET_6_R)

    # 草图26 → 凸台-拉伸6 (add)
    with BuildSketch(Plane(origin=(-21.499999999999982, 0, 0), x_dir=(0, 0, -1), z_dir=(1, 0, 0))):
        Polygon((-46.65000000000001, -12.100000000000001), (-91.35000000000001, -12.100000000000007), (-91.35000000000001, 12.099999999999993), (-46.65000000000001, 12.099999999999998), align=None)
        Polygon((-48.65, -10.1), (-89.35, -10.100000000000009), (-89.35, 10.09999999999999), (-48.65, 10.1), align=None, mode=Mode.SUBTRACT)
    extrude(amount=EXTRUDE_6_DEPTH)

    # 圆角7
    # the kernel refuses this fillet: 2 mm, written as the material it adds along each edge
    with BuildSketch(Plane(origin=(-21.499999999999982, -12.100000000000005, 90.5), x_dir=(-1, 0, 0), z_dir=(0, 1, 0))) as fillet_7_piece_1:
        with BuildLine():
            CenterArc((1.6363068172035504, 2), FILLET_7_R, 215.09963219525838, 54.90036780474162)
            Line((5.48184e-12, 0.8500000000038597), (0, 0))
            Line((0, 0), (1.6363068172035504, 0))
        make_face()
    extrude(amount=24.199999999999996)
    with BuildSketch(Plane(origin=(-21.499999999999982, 12.099999999999998, 47.50000000000001), x_dir=(-1, 0, 0), z_dir=(0, -1, 0))) as fillet_7_piece_2:
        with BuildLine():
            CenterArc((1.6363068172036037, 2), FILLET_7_R, 215.09963219525787, 54.90036780474213)
            Line((5.52447e-12, 0.8500000000038739), (0, 0))
            Line((0, 0), (1.6363068172036037, 0))
        make_face()
    extrude(amount=24.2)

    # 圆角8
    fillet_8_edges = [cut_extrude_14_piece_1.edges().sort_by_distance(p)[0] for p in [
        (-16.499999999999982, 12.099999999999998, 46.65000000000001),
        (-16.499999999999982, -12.100000000000001, 46.65000000000001),
        (-16.499999999999982, -12.100000000000007, 91.35000000000001),
        (-16.499999999999982, 12.099999999999993, 91.35000000000001),
    ]]
    fillet(fillet_8_edges, radius=FILLET_8_R)


with BuildPart() as cut_extrude_14_piece_2:
    # of the separate pieces the step leaves, piece 2, a body of its own (cut_extrude_14_pieces)
    add(part.part.solids().sort_by_distance((15.5, 21.5, 90.5))[0])

    # 草图25 → 切除-拉伸15 (cut, through all)
    with BuildSketch(Plane(origin=(0, 21.500000000000007, 0), x_dir=(1, 0, 0), z_dir=(0, 1, 0))):
        with Locations((18.69507721922934, -67.99850292450483)):
            Rectangle(SKETCH_25_W, SKETCH_25_H)
    extrude(amount=-CUT_EXTRUDE_15_DEPTH, mode=Mode.SUBTRACT)


solid = cut_extrude_14_piece_1.part
